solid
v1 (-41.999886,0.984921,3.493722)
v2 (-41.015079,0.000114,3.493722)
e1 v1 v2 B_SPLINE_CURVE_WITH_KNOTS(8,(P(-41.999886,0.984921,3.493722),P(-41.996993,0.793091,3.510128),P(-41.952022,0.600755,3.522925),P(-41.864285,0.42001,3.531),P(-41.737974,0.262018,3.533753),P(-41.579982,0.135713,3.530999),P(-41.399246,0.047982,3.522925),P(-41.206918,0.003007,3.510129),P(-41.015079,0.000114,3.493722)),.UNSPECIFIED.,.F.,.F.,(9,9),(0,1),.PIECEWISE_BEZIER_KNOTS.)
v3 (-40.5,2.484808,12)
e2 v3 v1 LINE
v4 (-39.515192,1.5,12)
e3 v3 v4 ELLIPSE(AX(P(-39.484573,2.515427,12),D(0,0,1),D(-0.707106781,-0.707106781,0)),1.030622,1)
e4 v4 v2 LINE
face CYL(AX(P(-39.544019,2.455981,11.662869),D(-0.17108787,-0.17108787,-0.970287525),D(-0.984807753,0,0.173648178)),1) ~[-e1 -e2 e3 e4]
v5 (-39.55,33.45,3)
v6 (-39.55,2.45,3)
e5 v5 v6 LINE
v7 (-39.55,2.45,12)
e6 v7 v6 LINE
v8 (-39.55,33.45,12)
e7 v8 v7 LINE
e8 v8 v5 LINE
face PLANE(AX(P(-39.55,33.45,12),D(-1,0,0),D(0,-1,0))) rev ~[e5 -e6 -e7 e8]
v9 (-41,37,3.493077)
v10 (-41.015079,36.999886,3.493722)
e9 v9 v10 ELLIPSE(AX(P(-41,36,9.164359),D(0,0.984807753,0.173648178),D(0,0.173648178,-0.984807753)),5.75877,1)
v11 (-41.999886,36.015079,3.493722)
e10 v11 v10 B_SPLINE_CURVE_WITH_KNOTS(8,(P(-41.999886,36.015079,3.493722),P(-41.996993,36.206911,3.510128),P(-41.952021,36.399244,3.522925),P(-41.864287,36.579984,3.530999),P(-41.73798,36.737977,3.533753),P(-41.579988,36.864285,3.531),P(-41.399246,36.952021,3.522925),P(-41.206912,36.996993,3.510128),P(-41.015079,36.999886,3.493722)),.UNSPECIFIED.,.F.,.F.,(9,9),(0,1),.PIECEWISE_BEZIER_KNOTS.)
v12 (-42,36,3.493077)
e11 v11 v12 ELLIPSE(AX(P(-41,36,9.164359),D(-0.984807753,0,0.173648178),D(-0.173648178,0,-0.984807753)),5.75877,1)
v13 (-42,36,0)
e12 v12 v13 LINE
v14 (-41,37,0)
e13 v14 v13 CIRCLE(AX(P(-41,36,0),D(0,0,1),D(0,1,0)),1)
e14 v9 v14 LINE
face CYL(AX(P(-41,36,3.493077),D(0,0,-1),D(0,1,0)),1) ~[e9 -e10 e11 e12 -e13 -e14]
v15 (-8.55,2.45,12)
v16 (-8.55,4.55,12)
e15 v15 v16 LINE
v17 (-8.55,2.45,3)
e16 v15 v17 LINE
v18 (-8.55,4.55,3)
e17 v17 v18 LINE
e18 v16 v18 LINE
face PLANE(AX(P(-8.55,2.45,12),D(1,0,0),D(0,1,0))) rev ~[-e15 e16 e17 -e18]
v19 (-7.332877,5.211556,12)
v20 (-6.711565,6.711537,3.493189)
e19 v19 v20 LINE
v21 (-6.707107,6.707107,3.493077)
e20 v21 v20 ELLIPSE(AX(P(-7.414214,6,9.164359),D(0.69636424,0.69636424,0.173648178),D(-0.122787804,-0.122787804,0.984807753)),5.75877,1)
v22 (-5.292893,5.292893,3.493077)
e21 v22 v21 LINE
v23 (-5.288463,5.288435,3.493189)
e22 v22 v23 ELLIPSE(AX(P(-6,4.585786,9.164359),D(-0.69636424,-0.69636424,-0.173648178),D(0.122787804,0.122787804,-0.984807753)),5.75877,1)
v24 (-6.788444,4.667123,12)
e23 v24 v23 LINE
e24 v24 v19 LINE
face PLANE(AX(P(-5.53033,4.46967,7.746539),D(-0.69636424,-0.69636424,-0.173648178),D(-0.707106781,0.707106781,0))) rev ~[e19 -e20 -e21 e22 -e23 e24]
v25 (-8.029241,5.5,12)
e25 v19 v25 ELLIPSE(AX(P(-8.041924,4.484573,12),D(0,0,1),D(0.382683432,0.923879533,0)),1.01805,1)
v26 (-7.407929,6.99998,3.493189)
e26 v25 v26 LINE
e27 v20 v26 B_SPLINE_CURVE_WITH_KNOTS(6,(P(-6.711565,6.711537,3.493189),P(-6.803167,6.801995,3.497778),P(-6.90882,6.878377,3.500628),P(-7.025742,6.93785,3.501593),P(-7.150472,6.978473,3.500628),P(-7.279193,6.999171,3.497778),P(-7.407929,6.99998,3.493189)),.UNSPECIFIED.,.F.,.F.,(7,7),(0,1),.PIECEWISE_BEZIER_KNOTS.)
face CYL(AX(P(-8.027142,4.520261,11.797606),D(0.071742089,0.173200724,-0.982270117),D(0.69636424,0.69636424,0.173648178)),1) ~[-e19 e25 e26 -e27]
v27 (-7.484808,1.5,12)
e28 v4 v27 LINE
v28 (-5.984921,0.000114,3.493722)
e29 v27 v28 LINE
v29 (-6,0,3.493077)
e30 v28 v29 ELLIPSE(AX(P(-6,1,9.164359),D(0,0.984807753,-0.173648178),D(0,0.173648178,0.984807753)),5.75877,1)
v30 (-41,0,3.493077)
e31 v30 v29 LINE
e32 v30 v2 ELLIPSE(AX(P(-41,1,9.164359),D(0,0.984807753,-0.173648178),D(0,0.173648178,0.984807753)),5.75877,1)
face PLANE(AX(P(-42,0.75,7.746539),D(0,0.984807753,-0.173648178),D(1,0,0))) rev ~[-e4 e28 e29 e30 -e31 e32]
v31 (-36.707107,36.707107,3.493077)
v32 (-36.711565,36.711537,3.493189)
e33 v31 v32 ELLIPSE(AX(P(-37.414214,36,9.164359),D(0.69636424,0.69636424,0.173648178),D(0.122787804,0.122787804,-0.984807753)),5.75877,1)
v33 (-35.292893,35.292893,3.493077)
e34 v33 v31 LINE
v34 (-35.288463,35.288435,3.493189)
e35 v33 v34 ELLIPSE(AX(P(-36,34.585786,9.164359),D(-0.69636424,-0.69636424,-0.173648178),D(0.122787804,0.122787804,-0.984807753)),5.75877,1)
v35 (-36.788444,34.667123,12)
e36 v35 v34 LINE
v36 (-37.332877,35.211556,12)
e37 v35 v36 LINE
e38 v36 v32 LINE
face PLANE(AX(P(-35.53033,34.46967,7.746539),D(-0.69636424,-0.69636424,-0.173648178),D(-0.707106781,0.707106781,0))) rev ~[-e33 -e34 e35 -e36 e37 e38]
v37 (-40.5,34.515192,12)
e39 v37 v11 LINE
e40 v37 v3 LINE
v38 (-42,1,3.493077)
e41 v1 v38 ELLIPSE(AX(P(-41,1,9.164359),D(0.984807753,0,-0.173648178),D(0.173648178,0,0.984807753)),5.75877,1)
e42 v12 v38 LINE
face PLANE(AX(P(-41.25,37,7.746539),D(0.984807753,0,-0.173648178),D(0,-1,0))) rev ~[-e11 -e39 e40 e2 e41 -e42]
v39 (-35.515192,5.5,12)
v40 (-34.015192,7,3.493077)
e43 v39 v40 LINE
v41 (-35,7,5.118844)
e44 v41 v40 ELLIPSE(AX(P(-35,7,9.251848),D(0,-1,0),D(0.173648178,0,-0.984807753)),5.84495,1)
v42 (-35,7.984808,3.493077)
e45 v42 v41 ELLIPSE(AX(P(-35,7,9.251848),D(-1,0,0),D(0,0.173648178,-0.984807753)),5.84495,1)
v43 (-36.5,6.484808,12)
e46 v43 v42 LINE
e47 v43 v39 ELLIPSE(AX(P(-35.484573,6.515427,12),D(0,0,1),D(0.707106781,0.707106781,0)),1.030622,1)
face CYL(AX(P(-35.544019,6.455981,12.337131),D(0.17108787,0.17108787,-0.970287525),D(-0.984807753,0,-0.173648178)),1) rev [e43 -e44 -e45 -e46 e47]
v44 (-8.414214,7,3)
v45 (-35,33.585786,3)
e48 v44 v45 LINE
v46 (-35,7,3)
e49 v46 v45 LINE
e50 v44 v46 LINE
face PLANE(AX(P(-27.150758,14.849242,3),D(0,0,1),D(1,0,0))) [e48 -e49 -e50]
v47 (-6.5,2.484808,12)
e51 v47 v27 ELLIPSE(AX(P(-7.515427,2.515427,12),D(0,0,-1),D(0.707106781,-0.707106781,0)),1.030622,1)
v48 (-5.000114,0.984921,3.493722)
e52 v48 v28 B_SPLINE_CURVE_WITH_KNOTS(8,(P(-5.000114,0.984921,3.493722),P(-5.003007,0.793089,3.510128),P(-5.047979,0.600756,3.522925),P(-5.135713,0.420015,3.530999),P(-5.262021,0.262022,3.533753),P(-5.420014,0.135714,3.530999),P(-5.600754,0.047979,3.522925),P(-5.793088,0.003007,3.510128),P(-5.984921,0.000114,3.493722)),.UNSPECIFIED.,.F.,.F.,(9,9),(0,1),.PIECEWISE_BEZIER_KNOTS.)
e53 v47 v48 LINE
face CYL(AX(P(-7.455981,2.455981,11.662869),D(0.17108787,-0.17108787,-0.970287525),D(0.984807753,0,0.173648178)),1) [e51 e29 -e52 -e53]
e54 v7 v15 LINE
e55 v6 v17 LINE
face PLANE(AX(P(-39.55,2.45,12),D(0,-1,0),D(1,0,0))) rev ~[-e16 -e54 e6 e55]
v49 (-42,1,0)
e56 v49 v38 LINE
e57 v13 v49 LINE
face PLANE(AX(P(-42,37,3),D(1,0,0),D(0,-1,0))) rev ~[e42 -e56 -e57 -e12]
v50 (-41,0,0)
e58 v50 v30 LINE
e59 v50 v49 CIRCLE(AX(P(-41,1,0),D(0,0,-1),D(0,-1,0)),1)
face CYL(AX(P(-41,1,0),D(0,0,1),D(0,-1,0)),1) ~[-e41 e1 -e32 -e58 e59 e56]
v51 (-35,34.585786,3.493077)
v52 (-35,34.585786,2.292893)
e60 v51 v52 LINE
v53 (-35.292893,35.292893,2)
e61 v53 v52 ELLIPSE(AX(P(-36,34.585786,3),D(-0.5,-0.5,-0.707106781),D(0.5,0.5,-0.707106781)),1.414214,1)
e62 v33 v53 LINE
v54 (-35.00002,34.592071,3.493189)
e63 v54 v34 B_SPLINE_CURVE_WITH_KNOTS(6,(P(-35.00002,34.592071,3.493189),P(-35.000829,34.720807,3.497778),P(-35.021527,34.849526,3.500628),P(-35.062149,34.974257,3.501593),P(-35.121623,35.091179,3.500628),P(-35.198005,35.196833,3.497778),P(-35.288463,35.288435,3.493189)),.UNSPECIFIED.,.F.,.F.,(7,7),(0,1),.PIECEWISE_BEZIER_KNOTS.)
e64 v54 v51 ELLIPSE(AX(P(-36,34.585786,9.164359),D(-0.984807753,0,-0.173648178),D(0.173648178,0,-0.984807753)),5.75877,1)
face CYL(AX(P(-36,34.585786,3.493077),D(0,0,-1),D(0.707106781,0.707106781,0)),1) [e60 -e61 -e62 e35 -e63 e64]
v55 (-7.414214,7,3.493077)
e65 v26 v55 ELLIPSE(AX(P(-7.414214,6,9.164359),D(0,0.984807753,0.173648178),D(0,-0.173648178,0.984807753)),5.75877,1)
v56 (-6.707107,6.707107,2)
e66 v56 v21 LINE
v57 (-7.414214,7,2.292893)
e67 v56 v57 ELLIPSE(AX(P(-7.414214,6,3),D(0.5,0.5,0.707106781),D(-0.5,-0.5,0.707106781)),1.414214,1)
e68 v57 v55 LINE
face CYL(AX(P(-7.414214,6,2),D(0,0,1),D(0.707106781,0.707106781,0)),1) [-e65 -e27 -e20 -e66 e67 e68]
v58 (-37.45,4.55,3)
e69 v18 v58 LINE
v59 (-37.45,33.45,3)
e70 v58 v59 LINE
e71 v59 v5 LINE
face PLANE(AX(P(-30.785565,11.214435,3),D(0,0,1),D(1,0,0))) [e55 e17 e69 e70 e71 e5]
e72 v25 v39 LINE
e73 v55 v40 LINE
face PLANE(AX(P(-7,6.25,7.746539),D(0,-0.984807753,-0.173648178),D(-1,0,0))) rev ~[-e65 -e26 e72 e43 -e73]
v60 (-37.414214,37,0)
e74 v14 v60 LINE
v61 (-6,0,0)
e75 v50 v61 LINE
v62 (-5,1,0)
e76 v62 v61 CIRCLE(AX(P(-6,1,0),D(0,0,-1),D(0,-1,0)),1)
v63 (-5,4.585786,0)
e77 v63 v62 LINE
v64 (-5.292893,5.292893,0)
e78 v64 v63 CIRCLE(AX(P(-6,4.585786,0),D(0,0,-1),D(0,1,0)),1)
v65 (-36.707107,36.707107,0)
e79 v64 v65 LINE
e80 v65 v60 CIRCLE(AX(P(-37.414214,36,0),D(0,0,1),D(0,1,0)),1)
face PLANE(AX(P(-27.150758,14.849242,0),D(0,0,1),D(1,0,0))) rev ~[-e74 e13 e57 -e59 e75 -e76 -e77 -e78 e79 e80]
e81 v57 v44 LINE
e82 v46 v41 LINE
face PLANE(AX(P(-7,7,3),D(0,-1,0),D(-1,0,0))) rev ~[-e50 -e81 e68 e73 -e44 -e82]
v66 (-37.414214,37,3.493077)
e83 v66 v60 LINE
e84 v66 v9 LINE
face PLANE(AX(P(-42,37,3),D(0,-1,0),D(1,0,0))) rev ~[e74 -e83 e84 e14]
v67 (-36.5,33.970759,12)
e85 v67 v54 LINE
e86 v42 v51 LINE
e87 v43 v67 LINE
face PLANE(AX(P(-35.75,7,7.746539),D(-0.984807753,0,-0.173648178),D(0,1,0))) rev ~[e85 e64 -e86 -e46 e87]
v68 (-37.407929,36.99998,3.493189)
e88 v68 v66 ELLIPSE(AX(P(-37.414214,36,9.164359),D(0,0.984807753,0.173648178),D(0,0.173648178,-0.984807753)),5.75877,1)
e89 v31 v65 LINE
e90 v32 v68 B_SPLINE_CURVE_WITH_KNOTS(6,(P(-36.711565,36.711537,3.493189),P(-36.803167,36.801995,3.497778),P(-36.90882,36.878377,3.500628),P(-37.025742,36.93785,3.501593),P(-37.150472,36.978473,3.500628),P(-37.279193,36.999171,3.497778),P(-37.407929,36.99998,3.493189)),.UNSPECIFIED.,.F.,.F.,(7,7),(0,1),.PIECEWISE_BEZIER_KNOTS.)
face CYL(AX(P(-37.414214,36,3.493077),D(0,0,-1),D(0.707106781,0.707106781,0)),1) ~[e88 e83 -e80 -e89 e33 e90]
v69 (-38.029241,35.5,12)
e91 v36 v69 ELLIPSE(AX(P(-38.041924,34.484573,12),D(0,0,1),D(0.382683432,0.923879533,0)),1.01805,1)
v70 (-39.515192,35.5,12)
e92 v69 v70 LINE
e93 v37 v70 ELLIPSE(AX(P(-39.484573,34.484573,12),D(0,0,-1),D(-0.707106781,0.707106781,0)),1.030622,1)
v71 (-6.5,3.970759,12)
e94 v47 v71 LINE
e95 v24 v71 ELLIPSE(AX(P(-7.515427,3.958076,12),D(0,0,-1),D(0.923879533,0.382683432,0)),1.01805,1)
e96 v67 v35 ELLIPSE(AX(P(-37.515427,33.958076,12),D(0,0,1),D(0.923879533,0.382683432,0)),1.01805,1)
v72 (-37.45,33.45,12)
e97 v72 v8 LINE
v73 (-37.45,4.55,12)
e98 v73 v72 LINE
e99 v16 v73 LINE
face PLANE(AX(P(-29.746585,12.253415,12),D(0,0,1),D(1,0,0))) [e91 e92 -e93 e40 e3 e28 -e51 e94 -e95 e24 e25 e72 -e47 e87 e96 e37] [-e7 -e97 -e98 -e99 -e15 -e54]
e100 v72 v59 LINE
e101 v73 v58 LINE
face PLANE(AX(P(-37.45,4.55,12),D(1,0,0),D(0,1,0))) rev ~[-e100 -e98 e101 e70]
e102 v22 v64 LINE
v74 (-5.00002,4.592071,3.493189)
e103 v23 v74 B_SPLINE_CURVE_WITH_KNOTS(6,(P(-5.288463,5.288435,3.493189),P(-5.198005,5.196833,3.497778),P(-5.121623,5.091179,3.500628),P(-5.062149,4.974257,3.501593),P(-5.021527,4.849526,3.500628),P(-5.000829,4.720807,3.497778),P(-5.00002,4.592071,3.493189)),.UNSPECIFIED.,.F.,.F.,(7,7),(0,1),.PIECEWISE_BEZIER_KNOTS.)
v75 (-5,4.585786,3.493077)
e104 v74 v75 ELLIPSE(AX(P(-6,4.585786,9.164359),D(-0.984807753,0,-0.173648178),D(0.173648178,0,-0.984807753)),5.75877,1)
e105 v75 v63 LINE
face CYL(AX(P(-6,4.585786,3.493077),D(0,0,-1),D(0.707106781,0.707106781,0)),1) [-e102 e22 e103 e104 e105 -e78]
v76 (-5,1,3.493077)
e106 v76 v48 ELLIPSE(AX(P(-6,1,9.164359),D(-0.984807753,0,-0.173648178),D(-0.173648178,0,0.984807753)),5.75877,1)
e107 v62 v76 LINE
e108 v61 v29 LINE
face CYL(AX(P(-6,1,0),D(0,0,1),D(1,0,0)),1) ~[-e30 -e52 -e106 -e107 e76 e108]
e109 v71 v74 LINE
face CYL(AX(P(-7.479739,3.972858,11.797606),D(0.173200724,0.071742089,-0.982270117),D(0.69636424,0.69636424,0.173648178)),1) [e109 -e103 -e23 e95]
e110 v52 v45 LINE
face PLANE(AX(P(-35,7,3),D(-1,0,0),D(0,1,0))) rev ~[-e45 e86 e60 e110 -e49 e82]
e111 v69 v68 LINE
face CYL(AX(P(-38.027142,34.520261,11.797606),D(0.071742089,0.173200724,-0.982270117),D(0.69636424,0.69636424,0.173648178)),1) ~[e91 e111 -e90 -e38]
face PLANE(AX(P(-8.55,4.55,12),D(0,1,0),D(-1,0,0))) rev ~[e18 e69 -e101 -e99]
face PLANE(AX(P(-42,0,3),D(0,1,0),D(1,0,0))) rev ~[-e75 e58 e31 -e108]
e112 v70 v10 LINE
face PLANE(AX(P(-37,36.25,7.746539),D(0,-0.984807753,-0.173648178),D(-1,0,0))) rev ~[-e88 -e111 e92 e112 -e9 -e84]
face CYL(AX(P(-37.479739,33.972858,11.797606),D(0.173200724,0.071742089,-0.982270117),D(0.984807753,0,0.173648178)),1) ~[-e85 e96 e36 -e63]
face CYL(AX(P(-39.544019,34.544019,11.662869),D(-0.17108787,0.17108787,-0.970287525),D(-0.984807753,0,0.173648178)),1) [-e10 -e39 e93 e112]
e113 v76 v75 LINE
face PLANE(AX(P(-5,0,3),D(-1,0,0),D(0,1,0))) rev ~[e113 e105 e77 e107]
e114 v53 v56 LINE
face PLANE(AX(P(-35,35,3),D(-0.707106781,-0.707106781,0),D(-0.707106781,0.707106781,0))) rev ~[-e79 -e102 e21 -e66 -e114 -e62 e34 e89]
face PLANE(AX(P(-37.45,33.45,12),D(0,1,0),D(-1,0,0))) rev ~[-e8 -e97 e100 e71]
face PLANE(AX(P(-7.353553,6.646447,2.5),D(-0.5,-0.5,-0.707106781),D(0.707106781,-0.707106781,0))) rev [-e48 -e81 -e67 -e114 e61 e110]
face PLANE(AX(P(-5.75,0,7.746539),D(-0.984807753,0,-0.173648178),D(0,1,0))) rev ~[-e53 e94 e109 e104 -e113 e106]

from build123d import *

# Parameters (mm, degrees)
F1_DEPTH  = 3
F3_DEPTH  = 9
F5_DEPTH  = 9
F7_DEPTH  = 25
F9_DEPTH  = 25
F10_SIZE2 = 8.5069227294
F10_SIZE  = 1.5
F11_SIZE  = 1
F12_F1_R  = 1
F12_F2_R  = 1
F12_F3_R  = 1
F12_F4_R  = 1
F12_F5_R  = 1
F12_F6_R  = 1
F12_F7_R  = 1
F12_F8_R  = 1
F12_F9_R  = 1
F12_F10_R = 1
F12_F11_R = 1
F12_F12_R = 1
F12_F13_R = 1
F12_F14_R = 1
F12_F15_R = 1


with BuildPart() as f1:
    # F0 (on Top) → F1 (new body)
    with BuildSketch(Plane.XY):
        Polygon((0, 0), (-42, 42), (-42, 0), align=None)
    extrude(amount=F1_DEPTH)

    # F2 (on face) → F3 (join)
    with BuildSketch(Plane.XY.offset(3)):
        Polygon((-42, 37), (-42, 0), (-5, 0), (-5, 5), (-7, 7), (-35, 7), (-35, 35), (-37, 37), align=None)
    extrude(amount=F3_DEPTH)

    # F4 (on face) → F5 (cut)
    with BuildSketch(Plane.XY.offset(12)):
        Polygon((-39.55, 33.45), (-39.55, 2.45), (-8.55, 2.45), (-8.55, 4.55), (-37.45, 4.55), (-37.45, 33.45), align=None)
    extrude(amount=-F5_DEPTH, mode=Mode.SUBTRACT)

    # F6 (on face) → F7 (cut)
    with BuildSketch(Plane.XY.offset(3)):
        Polygon((-5, 5), (-5, 0), (0, 0), align=None)
    extrude(amount=-F7_DEPTH, mode=Mode.SUBTRACT)

    # F8 (on face) → F9 (cut)
    with BuildSketch(Plane.XY.offset(3)):
        Polygon((-42, 42), (-42, 37), (-37, 37), align=None)
    extrude(amount=-F9_DEPTH, mode=Mode.SUBTRACT)

    # F10
    f10_edges = [f1.edges().sort_by_distance(p)[0] for p in [
        (-23.5, 0, 12),
        (-5, 2.5, 12),
        (-6, 6, 12),
        (-21, 7, 12),
        (-35, 21, 12),
        (-36, 36, 12),
        (-39.5, 37, 12),
        (-42, 18.5, 12),
    ]]
    f10_side = f1.faces().sort_by_distance((-41.476741, 18.5, 12))[0]
    chamfer(f10_edges, length=F10_SIZE, length2=F10_SIZE2, reference=f10_side)

    # F11
    f11_edges = [f1.edges().sort_by_distance(p)[0] for p in [
        (-21, 21, 3),
    ]]
    chamfer(f11_edges, length=F11_SIZE)

    # F12: fillet of radius 1 on 17 edges, made by hand

    # F12_f1
    f12_f1_edges = [f1.edges().sort_by_distance(p)[0] for p in [
        (-7, 7, 2.5),
        (-7, 7, 3.2465386353),
    ]]
    fillet(f12_f1_edges, radius=F12_F1_R)

    # F12_f2
    f12_f2_edges = [f1.edges().sort_by_distance(p)[0] for p in [
        (-35, 35, 2.5),
        (-35, 35, 3.2465386353),
    ]]
    fillet(f12_f2_edges, radius=F12_F2_R)

    # F12_f3
    f12_f3_edges = [f1.edges().sort_by_distance(p)[0] for p in [
        (-5, 5, 1.7465386353),
    ]]
    fillet(f12_f3_edges, radius=F12_F3_R)

    # F12_f4
    f12_f4_edges = [f1.edges().sort_by_distance(p)[0] for p in [
        (-37, 37, 1.7465386353),
    ]]
    fillet(f12_f4_edges, radius=F12_F4_R)

    # F12_f5
    f12_f5_edges = [f1.edges().sort_by_distance(p)[0] for p in [
        (-5.7880602337, 4.6735747632, 7.962388947),
    ]]
    fillet(f12_f5_edges, radius=F12_F5_R)

    # F12_f6
    f12_f6_edges = [f1.edges().sort_by_distance(p)[0] for p in [
        (-7.3264252368, 6.2119397663, 7.962388947),
    ]]
    fillet(f12_f6_edges, radius=F12_F6_R)

    # F12_f7
    f12_f7_edges = [f1.edges().sort_by_distance(p)[0] for p in [
        (-5, 0, 1.7465386353),
    ]]
    fillet(f12_f7_edges, radius=F12_F7_R)

    # F12_f8
    f12_f8_edges = [f1.edges().sort_by_distance(p)[0] for p in [
        (-35.7880602337, 34.6735747632, 7.962388947),
    ]]
    fillet(f12_f8_edges, radius=F12_F8_R)

    # F12_f9
    f12_f9_edges = [f1.edges().sort_by_distance(p)[0] for p in [
        (-37.3264252368, 36.2119397663, 7.962388947),
    ]]
    fillet(f12_f9_edges, radius=F12_F9_R)

    # F12_f10
    f12_f10_edges = [f1.edges().sort_by_distance(p)[0] for p in [
        (-42, 37, 1.7465386353),
    ]]
    fillet(f12_f10_edges, radius=F12_F10_R)

    # F12_f11
    f12_f11_edges = [f1.edges().sort_by_distance(p)[0] for p in [
        (-35.75, 6.25, 7.7465386353),
    ]]
    fillet(f12_f11_edges, radius=F12_F11_R)

    # F12_f12
    f12_f12_edges = [f1.edges().sort_by_distance(p)[0] for p in [
        (-5.8964466094, 0.8964466094, 8.5770786288),
    ]]
    fillet(f12_f12_edges, radius=F12_F12_R)

    # F12_f13
    f12_f13_edges = [f1.edges().sort_by_distance(p)[0] for p in [
        (-42, 0, 1.7465386353),
    ]]
    fillet(f12_f13_edges, radius=F12_F13_R)

    # F12_f14
    f12_f14_edges = [f1.edges().sort_by_distance(p)[0] for p in [
        (-41.1035533906, 36.1035533906, 8.5770786288),
    ]]
    fillet(f12_f14_edges, radius=F12_F14_R)

    # F12_f15
    f12_f15_edges = [f1.edges().sort_by_distance(p)[0] for p in [
        (-41.1035533906, 0.8964466094, 8.5770786288),
    ]]
    fillet(f12_f15_edges, radius=F12_F15_R)


solid = f1.part
